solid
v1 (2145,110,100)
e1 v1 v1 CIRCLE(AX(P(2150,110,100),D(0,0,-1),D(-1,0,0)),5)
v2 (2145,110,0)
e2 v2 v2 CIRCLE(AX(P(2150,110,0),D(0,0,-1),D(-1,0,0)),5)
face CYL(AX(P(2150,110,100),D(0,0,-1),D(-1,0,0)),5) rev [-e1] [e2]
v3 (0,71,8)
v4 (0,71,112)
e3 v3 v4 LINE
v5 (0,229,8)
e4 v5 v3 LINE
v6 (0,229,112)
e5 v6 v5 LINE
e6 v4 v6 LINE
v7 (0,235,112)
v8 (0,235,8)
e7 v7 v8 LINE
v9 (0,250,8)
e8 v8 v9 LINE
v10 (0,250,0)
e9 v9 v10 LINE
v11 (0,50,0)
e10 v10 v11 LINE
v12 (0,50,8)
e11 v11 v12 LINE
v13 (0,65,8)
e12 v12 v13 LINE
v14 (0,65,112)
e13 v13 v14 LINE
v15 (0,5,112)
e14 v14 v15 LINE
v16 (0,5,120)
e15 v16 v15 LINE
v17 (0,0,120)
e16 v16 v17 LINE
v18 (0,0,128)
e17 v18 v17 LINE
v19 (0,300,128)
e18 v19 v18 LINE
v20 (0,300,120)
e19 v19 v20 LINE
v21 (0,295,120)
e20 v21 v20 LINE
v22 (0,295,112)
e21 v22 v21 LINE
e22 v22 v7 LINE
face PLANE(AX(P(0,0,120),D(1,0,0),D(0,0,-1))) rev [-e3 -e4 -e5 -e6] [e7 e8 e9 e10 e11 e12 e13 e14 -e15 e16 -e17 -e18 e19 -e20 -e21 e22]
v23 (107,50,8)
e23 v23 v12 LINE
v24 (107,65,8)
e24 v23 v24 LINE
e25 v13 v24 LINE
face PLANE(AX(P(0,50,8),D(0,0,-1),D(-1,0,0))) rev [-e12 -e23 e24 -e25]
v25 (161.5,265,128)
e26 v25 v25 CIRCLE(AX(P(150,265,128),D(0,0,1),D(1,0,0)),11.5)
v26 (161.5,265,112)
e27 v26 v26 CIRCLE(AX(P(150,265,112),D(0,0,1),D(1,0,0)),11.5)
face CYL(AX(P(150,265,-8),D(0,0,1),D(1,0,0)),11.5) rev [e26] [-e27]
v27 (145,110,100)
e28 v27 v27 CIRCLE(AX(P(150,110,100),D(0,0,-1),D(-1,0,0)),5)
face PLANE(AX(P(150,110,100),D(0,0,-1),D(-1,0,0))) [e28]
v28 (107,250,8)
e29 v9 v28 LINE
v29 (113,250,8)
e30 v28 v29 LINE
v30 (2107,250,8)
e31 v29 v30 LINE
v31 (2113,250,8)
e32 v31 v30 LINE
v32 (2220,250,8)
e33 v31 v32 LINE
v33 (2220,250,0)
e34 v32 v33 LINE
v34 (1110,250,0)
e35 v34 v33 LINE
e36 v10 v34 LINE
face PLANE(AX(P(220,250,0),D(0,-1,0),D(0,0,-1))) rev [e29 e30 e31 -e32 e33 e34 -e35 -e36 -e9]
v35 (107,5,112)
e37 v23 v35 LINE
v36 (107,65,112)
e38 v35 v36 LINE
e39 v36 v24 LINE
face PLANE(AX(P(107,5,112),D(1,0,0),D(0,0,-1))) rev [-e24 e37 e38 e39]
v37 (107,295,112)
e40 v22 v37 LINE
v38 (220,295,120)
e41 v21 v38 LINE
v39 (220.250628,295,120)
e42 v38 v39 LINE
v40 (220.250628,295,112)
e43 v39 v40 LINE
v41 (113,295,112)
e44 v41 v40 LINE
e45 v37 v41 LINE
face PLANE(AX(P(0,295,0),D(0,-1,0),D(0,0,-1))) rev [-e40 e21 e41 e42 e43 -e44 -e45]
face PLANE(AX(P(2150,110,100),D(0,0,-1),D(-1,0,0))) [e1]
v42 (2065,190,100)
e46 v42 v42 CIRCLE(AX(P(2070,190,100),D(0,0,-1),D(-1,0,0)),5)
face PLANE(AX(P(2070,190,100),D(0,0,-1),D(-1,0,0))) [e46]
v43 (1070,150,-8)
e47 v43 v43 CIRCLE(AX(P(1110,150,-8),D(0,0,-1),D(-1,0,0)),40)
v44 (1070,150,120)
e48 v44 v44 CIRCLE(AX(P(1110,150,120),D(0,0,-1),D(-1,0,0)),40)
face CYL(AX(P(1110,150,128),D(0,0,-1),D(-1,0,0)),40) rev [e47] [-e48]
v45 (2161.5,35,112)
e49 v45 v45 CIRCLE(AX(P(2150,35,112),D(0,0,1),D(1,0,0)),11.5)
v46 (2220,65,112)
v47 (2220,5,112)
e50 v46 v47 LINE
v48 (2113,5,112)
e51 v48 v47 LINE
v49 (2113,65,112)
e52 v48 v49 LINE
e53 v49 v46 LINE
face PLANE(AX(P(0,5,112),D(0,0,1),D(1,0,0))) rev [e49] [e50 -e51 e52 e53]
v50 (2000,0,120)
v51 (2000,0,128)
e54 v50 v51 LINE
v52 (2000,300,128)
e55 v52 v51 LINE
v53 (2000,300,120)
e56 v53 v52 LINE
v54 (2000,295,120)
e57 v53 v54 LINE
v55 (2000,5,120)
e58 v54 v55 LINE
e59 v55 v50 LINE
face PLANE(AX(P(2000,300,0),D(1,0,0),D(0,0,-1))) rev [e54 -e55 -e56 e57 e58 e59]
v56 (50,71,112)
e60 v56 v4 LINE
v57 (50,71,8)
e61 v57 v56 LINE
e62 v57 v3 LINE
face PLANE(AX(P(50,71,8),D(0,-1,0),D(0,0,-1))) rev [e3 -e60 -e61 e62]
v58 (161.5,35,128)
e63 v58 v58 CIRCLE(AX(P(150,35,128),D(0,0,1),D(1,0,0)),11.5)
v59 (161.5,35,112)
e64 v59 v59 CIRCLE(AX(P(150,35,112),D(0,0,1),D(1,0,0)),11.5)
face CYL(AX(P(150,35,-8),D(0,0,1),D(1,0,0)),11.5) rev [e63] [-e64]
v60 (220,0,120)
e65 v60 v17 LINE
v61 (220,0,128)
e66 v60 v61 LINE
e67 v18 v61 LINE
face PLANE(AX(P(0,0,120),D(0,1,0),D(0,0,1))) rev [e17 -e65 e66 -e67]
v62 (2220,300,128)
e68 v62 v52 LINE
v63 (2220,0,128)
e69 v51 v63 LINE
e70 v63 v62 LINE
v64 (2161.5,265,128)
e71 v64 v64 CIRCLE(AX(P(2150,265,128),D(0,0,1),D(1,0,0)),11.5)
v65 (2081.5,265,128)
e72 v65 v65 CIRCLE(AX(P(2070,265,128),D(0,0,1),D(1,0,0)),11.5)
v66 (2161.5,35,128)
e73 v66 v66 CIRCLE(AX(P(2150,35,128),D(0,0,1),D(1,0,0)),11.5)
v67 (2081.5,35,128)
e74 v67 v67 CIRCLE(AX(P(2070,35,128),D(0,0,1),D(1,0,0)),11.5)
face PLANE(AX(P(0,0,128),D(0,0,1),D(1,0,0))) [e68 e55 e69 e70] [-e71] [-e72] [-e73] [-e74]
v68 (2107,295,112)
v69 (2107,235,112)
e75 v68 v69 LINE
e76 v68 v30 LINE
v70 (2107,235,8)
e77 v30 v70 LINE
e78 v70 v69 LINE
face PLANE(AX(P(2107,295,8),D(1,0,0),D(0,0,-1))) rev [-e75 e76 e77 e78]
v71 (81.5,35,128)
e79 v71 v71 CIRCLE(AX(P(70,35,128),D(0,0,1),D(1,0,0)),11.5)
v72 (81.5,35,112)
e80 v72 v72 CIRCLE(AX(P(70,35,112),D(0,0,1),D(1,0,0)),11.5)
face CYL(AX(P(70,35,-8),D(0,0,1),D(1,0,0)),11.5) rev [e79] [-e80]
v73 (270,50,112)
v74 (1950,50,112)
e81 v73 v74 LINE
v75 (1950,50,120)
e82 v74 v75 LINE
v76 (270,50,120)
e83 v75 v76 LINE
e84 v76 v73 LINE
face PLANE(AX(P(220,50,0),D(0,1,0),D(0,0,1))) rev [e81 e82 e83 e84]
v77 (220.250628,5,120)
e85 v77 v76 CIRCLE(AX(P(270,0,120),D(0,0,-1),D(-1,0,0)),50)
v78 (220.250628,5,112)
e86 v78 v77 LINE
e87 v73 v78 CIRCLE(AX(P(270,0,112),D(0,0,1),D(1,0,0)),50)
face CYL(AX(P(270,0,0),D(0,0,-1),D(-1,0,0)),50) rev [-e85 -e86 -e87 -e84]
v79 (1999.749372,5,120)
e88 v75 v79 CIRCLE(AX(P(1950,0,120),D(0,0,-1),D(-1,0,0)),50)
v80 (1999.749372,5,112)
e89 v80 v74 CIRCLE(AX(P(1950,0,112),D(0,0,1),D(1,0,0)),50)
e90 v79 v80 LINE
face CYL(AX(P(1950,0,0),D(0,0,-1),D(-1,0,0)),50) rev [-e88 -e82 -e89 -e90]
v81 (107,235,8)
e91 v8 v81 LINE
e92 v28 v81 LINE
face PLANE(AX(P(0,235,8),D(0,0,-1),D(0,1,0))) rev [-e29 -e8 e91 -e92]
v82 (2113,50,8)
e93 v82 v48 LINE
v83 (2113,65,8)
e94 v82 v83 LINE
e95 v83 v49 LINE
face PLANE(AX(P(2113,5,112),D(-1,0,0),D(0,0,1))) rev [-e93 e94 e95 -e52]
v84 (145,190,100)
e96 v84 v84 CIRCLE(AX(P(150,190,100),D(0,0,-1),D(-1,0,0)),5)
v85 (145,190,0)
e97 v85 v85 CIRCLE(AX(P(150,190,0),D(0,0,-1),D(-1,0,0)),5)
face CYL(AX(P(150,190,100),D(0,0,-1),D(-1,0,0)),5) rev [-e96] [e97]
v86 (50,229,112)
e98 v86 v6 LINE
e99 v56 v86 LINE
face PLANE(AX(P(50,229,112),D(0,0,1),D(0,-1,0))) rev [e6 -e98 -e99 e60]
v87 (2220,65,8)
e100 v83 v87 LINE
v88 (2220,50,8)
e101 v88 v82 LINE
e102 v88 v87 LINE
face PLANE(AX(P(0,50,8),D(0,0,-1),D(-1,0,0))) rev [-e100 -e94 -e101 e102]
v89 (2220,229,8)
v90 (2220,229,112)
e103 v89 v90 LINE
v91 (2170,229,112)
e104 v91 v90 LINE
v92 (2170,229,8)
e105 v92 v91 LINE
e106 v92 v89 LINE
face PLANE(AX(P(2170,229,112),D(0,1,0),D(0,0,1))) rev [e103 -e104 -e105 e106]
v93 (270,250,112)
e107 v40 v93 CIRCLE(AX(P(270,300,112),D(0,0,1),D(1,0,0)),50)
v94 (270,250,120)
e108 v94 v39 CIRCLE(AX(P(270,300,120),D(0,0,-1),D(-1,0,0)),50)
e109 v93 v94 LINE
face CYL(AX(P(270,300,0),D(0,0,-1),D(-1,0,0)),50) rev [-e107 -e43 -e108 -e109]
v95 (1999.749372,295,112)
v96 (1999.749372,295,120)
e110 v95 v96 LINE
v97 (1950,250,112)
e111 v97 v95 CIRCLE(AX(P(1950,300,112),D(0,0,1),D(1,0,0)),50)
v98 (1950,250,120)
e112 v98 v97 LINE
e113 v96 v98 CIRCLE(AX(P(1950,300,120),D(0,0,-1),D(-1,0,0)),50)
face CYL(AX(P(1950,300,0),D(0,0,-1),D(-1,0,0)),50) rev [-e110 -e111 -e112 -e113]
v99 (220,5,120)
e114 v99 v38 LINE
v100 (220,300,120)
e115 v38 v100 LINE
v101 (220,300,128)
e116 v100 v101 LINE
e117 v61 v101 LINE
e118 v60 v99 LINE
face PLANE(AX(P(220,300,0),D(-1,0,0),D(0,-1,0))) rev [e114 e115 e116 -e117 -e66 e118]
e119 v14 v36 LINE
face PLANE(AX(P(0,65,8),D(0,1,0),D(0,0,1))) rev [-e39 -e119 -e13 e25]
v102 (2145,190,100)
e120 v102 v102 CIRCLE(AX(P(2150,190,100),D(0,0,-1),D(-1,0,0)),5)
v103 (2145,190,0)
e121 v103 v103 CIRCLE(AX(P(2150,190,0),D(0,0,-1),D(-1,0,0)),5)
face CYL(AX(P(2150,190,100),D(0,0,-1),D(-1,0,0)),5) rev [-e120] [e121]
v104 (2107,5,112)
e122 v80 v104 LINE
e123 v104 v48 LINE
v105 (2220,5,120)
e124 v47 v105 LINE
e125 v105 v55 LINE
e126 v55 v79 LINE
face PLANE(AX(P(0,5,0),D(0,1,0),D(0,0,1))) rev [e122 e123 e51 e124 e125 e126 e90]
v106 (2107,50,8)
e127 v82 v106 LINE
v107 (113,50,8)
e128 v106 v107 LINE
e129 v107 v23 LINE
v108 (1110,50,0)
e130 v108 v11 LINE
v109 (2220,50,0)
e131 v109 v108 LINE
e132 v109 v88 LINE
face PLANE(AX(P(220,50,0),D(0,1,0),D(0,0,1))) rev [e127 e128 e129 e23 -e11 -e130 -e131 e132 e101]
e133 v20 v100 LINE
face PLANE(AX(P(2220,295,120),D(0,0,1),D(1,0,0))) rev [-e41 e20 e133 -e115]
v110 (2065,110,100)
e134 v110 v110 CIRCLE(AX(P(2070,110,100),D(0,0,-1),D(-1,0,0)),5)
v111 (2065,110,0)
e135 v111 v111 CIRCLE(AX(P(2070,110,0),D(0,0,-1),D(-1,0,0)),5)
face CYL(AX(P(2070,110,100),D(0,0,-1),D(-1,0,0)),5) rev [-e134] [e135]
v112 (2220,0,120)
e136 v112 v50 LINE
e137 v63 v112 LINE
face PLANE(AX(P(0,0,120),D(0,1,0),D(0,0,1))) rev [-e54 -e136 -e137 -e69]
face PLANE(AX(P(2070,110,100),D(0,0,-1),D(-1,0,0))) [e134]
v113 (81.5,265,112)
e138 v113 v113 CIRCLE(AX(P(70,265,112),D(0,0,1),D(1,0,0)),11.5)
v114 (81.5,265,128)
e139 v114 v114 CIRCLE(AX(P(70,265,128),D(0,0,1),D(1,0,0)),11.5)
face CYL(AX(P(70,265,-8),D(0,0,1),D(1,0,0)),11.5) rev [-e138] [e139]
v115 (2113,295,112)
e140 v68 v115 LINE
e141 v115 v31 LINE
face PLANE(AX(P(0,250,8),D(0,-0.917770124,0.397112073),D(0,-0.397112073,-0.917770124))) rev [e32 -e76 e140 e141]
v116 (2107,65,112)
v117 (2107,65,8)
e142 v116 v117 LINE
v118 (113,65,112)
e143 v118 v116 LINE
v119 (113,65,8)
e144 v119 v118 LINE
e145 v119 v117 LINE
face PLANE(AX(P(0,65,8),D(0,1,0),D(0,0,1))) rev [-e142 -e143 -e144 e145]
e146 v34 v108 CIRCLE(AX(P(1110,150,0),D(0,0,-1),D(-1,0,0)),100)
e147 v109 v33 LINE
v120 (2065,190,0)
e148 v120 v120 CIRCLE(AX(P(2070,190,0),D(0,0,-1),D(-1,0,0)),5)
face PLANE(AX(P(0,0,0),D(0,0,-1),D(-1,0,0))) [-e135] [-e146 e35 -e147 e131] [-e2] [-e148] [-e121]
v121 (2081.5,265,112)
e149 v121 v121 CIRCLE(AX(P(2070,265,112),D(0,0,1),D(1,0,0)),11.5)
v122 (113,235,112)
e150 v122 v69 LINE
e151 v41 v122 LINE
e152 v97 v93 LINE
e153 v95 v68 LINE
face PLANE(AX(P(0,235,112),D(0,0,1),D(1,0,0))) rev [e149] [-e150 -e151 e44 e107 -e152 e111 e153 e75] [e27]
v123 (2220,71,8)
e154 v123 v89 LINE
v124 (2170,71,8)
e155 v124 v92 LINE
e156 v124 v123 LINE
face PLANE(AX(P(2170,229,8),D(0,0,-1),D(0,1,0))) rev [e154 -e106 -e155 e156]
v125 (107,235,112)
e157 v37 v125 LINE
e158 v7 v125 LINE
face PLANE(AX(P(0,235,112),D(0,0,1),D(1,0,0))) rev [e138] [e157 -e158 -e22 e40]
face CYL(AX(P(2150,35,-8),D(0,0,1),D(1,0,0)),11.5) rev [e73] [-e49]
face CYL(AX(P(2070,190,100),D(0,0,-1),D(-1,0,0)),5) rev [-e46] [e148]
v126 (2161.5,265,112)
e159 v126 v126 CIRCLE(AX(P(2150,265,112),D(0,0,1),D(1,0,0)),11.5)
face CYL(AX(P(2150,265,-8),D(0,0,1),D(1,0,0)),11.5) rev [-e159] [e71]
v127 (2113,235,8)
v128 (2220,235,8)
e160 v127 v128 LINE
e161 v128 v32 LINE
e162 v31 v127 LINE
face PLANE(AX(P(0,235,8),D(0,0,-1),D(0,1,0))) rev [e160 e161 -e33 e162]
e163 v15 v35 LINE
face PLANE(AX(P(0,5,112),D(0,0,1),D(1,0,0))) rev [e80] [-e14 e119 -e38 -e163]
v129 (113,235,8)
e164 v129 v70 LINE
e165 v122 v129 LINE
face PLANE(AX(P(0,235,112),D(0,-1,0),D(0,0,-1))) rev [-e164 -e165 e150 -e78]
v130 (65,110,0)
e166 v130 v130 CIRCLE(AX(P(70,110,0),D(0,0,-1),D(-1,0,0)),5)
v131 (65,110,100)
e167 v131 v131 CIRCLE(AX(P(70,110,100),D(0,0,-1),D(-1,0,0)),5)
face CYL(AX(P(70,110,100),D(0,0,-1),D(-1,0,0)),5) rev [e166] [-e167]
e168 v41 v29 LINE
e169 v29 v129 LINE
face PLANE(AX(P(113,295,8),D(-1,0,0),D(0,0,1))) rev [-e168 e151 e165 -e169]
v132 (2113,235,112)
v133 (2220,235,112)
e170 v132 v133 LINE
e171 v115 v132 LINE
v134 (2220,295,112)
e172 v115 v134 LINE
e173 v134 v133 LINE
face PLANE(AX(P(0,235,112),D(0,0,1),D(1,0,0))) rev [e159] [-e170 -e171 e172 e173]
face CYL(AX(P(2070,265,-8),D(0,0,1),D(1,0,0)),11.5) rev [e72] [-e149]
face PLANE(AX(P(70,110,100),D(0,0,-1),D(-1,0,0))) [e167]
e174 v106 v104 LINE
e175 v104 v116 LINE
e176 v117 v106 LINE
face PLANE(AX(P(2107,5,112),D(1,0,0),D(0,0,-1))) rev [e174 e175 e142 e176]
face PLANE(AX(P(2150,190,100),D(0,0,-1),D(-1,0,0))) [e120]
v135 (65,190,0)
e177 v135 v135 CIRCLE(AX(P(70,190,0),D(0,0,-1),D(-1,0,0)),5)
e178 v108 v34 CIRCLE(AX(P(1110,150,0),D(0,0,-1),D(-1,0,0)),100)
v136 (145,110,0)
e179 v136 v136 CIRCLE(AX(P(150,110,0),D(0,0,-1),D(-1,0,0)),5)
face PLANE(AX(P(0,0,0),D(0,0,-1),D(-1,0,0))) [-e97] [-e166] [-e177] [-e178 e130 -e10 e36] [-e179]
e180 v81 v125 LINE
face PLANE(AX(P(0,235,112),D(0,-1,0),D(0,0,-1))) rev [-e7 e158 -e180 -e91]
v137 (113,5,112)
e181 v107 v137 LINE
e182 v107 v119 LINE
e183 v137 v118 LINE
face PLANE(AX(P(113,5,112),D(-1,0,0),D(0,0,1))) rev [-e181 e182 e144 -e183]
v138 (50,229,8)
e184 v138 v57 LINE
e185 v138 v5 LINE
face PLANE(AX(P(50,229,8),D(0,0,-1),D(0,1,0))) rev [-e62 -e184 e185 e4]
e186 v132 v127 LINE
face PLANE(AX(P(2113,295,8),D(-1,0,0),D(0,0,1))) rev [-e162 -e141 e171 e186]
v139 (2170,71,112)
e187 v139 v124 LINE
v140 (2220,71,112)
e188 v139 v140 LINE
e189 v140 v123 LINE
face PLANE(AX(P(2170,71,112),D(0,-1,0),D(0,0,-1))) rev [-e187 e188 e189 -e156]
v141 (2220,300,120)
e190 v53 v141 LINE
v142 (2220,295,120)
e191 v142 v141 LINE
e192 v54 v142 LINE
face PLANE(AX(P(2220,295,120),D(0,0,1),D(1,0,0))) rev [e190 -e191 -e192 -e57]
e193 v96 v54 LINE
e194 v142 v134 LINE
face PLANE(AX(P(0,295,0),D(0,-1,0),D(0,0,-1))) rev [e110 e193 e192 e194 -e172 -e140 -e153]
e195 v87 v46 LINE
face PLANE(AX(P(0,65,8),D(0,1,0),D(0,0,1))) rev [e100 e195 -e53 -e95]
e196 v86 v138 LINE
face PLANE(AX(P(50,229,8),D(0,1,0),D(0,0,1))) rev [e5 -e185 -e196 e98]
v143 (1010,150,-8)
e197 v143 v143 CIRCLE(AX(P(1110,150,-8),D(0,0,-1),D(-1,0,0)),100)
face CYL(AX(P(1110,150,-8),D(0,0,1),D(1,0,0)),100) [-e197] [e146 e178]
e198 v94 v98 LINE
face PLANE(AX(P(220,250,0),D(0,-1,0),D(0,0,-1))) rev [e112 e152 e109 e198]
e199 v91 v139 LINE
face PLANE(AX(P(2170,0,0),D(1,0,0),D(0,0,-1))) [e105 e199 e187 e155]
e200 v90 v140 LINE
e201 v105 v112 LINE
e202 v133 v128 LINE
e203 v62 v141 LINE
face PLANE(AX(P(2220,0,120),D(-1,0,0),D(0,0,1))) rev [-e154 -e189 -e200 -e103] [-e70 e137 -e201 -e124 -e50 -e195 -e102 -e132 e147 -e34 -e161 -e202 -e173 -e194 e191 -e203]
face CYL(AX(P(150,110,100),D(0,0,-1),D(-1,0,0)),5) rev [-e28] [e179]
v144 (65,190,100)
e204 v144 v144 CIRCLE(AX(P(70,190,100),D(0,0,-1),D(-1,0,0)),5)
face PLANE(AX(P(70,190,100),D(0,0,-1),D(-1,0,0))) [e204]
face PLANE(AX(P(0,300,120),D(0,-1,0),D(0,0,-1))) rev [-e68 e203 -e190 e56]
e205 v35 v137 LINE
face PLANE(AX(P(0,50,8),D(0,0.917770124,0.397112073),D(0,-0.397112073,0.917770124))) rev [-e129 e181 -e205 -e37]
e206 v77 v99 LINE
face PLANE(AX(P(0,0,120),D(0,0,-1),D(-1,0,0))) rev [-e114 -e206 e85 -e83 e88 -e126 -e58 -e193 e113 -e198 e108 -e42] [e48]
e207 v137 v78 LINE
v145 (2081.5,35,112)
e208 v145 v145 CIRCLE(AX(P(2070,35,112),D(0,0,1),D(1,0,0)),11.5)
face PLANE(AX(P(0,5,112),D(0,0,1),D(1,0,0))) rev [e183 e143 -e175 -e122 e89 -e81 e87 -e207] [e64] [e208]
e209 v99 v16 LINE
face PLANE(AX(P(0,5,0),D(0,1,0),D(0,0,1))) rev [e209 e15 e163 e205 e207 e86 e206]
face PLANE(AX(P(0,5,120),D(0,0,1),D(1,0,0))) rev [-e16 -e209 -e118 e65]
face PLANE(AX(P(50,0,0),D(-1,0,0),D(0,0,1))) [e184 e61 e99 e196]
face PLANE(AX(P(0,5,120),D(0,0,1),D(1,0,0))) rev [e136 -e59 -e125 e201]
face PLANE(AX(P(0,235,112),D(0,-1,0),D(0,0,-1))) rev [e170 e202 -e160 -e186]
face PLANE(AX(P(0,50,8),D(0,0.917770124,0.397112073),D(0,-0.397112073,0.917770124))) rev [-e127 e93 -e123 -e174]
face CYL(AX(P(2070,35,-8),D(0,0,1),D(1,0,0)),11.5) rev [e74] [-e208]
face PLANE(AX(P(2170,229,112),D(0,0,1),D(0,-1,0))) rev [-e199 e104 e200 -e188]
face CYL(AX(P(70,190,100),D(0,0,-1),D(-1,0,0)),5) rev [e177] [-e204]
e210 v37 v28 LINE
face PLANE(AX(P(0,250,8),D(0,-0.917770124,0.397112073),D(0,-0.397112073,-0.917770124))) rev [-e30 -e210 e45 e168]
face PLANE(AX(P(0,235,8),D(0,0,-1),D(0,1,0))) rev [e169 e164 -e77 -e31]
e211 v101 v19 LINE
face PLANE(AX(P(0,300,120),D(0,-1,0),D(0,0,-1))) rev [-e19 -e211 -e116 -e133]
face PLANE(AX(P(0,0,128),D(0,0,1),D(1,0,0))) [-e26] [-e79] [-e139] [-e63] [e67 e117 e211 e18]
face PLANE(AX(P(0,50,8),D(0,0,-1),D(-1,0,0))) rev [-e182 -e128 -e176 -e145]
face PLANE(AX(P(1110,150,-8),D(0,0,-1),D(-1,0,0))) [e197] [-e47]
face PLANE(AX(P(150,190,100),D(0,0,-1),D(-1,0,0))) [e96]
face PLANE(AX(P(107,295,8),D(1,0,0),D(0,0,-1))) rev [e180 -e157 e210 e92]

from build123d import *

# Parameters (mm, degrees)
SKETCH_1_W                       = 2220
SKETCH_1_H                       = 300
EXTRUDE_1_DEPTH                  = 120
SKETCH_2_W                       = 1780
SKETCH_2_H                       = 50
CUT_EXTRUDE_1_DEPTH              = 2244.390291501
SKETCH_3_W                       = 220
SKETCH_3_H                       = 300
EXTRUDE_2_DEPTH                  = 8
SKETCH_4_W                       = 2220
SKETCH_4_H                       = 120
CUT_EXTRUDE_2_DEPTH              = 5
SKETCH_5_W                       = 2220
SKETCH_5_H                       = 120
CUT_EXTRUDE_3_DEPTH              = 5
CUT_EXTRUDE_11_DEPTH             = 2244.832435812
SKETCH_14_W                      = 6
SKETCH_14_H                      = 104
EXTRUDE_3_DEPTH                  = 60
SKETCH_16_W                      = 6
SKETCH_16_H                      = 104
EXTRUDE_4_DEPTH                  = 60
CUT_EXTRUDE_12_DEPTH             = 2139.025490961
PATTERN_LINEAR_2_COUNT           = 2
PATTERN_LINEAR_2_PITCH           = 2000
FILLET_3_R                       = 50
SKETCH_17_W                      = 104
SKETCH_17_H                      = 158
CUT_EXTRUDE_13_DEPTH             = 50
SKETCH_18_W                      = 104
SKETCH_18_H                      = 158
CUT_EXTRUDE_14_DEPTH             = 50
SKETCH_19_R                      = 100
EXTRUDE_5_DEPTH                  = 8
SKETCH_20_R                      = 40
CUT_EXTRUDE_15_DEPTH             = 2245.303009845
SKETCH_21_R                      = 11.5
CUT_EXTRUDE_16_DEPTH             = 2245.303009845
PATTERN_LINEAR_3_COUNT           = 2
PATTERN_LINEAR_3_PITCH           = 80
PATTERN_LINEAR_3_COUNT_DIR2      = 2
PATTERN_LINEAR_3_PITCH_DIR2      = 230
PATTERN_LINEAR_4_COUNT           = 2
PATTERN_LINEAR_4_PITCH           = 2000
PATTERN_LINEAR_4_COPY_1_SKETCH_R = 11.5
PATTERN_LINEAR_4_COPY_1_DEPTH    = 2245.303009845
PATTERN_LINEAR_4_COPY_2_SKETCH_R = 11.5
PATTERN_LINEAR_4_COPY_2_DEPTH    = 2245.303009845
PATTERN_LINEAR_4_COPY_3_SKETCH_R = 11.5
PATTERN_LINEAR_4_COPY_3_DEPTH    = 2245.303009845
SKETCH_22_R                      = 5
CUT_EXTRUDE_17_DEPTH             = 100
PATTERN_LINEAR_5_COUNT           = 2
PATTERN_LINEAR_5_PITCH           = 80
PATTERN_LINEAR_5_COUNT_DIR2      = 2
PATTERN_LINEAR_5_PITCH_DIR2      = 80
PATTERN_LINEAR_6_COUNT           = 2
PATTERN_LINEAR_6_PITCH           = 2000
PATTERN_LINEAR_6_COPY_1_SKETCH_R = 5
PATTERN_LINEAR_6_COPY_1_DEPTH    = 100
PATTERN_LINEAR_6_COPY_2_SKETCH_R = 5
PATTERN_LINEAR_6_COPY_2_DEPTH    = 100
PATTERN_LINEAR_6_COPY_3_SKETCH_R = 5
PATTERN_LINEAR_6_COPY_3_DEPTH    = 100


with BuildPart() as part:
    # 草图1 → 凸台-拉伸1 (new body)
    with BuildSketch(Plane.XY):
        with Locations((1110, 150)):
            Rectangle(SKETCH_1_W, SKETCH_1_H)
    extrude(amount=EXTRUDE_1_DEPTH)

    # 草图2 → 切除-拉伸1 (cut, through all)
    with BuildSketch(Plane.XY.offset(120)):
        with Locations((1110, 275)):
            Rectangle(SKETCH_2_W, SKETCH_2_H)
        with Locations((1110, 25)):
            Rectangle(SKETCH_2_W, SKETCH_2_H)
    extrude(amount=-CUT_EXTRUDE_1_DEPTH, mode=Mode.SUBTRACT)

    # 草图3 → 凸台-拉伸2 (add)
    with BuildSketch(Plane.XY.offset(120)):
        with Locations((110, 150)):
            Rectangle(SKETCH_3_W, SKETCH_3_H)
        with Locations((2110, 150)):
            Rectangle(SKETCH_3_W, SKETCH_3_H)
    extrude(amount=EXTRUDE_2_DEPTH)

    # 草图4 → 切除-拉伸2 (cut)
    with BuildSketch(Plane(origin=(0, 300, 0), x_dir=(1, 0, 0), z_dir=(0, 1, 0))):
        with Locations((1110, -60)):
            Rectangle(SKETCH_4_W, SKETCH_4_H)
    extrude(amount=-CUT_EXTRUDE_2_DEPTH, mode=Mode.SUBTRACT)

    # 草图5 → 切除-拉伸3 (cut)
    with BuildSketch(Plane.XZ):
        with Locations((1110, 60)):
            Rectangle(SKETCH_5_W, SKETCH_5_H)
    extrude(amount=-CUT_EXTRUDE_3_DEPTH, mode=Mode.SUBTRACT)

    # 草图13 → 切除-拉伸11 (cut, through all)
    with BuildSketch(Plane(origin=(2220, 0, 0), x_dir=(0, 0, -1), z_dir=(1, 0, 0))):
        Polygon((-112, 235), (-8, 235), (-8, 250), (0, 250), (0, 295), (-112, 295), align=None)
        Polygon((-112, 5), (0, 5), (0, 50), (-8, 50), (-8, 65), (-112, 65), align=None)
    extrude(amount=-CUT_EXTRUDE_11_DEPTH, mode=Mode.SUBTRACT)

    # 草图14 → 凸台-拉伸3 (add)
    with BuildSketch(Plane(origin=(0, 235, 0), x_dir=(1, 0, 0), z_dir=(0, 1, 0))):
        with Locations((2110, -60)):
            Rectangle(SKETCH_14_W, SKETCH_14_H)
    extrude_3 = extrude(amount=EXTRUDE_3_DEPTH)

    # 草图16 → 凸台-拉伸4 (add)
    with BuildSketch(Plane.XZ.offset(-65)):
        with Locations((2110, 60)):
            Rectangle(SKETCH_16_W, SKETCH_16_H)
    extrude_4 = extrude(amount=EXTRUDE_4_DEPTH)

    # 草图15 → 切除-拉伸12 (cut, through all)
    with BuildSketch(Plane(origin=(2113, 0, 0), x_dir=(0, 0, -1), z_dir=(1, 0, 0))):
        Polygon((-8, 295), (-8, 250), (-112, 295), align=None)
        Polygon((-8, 50), (-112, 5), (-8, 5), align=None)
    cut_extrude_12 = extrude(amount=-CUT_EXTRUDE_12_DEPTH, mode=Mode.SUBTRACT)

    # 阵列(线性)2: 凸台-拉伸3, 凸台-拉伸4, 切除-拉伸12 ×2
    with Locations(*[(-i * PATTERN_LINEAR_2_PITCH, 0, 0) for i in range(1, PATTERN_LINEAR_2_COUNT)]):
        add(extrude_3)
        add(extrude_4)
        add(cut_extrude_12, mode=Mode.SUBTRACT)

    # 圆角3
    # the kernel refuses this fillet: 50 mm, written as the material it adds along each edge
    with BuildSketch(Plane(origin=(220, 250, 120), x_dir=(0, 1, 0), z_dir=(0, 0, -1))) as fillet_3_piece_1_section:
        with BuildLine():
            CenterArc((FILLET_3_R, FILLET_3_R), FILLET_3_R, 180, 90)
            Line((0, FILLET_3_R), (0, 0))
            Line((0, 0), (FILLET_3_R, 0))
        make_face()
    fillet_3_piece_1 = extrude(amount=8, mode=Mode.PRIVATE)
    fillet_3_piece_1 = split(fillet_3_piece_1, bisect_by=Plane(origin=(231.177032, 295, 116), z_dir=(0, -1, 0)), keep=Keep.TOP, mode=Mode.PRIVATE)
    add(fillet_3_piece_1)
    with BuildSketch(Plane(origin=(2000, 250, 120), x_dir=(-1, 0, 0), z_dir=(0, 0, -1))) as fillet_3_piece_2_section:
        with BuildLine():
            CenterArc((FILLET_3_R, FILLET_3_R), FILLET_3_R, 180, 90)
            Line((0, FILLET_3_R), (0, 0))
            Line((0, 0), (FILLET_3_R, 0))
        make_face()
    fillet_3_piece_2 = extrude(amount=8, mode=Mode.PRIVATE)
    fillet_3_piece_2 = split(fillet_3_piece_2, bisect_by=Plane(origin=(1988.822968, 295, 116), z_dir=(0, -1, 0)), keep=Keep.TOP, mode=Mode.PRIVATE)
    add(fillet_3_piece_2)
    with BuildSketch(Plane(origin=(2000, 50, 120), x_dir=(-1, 0, 0), z_dir=(0, 0, -1))) as fillet_3_piece_3_section:
        with BuildLine():
            CenterArc((FILLET_3_R, -FILLET_3_R), FILLET_3_R, 90, 90)
            Line((0, -FILLET_3_R), (0, 0))
            Line((0, 0), (FILLET_3_R, 0))
        make_face()
    fillet_3_piece_3 = extrude(amount=8, mode=Mode.PRIVATE)
    fillet_3_piece_3 = split(fillet_3_piece_3, bisect_by=Plane(origin=(1988.822968, 5, 116), z_dir=(0, 1, 0)), keep=Keep.TOP, mode=Mode.PRIVATE)
    add(fillet_3_piece_3)
    with BuildSketch(Plane(origin=(220, 50, 120), x_dir=(0, -1, 0), z_dir=(0, 0, -1))) as fillet_3_piece_4_section:
        with BuildLine():
            CenterArc((FILLET_3_R, -FILLET_3_R), FILLET_3_R, 90, 90)
            Line((0, -FILLET_3_R), (0, 0))
            Line((0, 0), (FILLET_3_R, 0))
        make_face()
    fillet_3_piece_4 = extrude(amount=8, mode=Mode.PRIVATE)
    fillet_3_piece_4 = split(fillet_3_piece_4, bisect_by=Plane(origin=(231.177032, 5, 116), z_dir=(0, 1, 0)), keep=Keep.TOP, mode=Mode.PRIVATE)
    add(fillet_3_piece_4)

    # 草图17 → 切除-拉伸13 (cut)
    with BuildSketch(Plane.ZY):
        with Locations((60, 150)):
            Rectangle(SKETCH_17_W, SKETCH_17_H)
    extrude(amount=-CUT_EXTRUDE_13_DEPTH, mode=Mode.SUBTRACT)

    # 草图18 → 切除-拉伸14 (cut)
    with BuildSketch(Plane(origin=(2220, 0, 0), x_dir=(0, 0, -1), z_dir=(1, 0, 0))):
        with Locations((-60, 150)):
            Rectangle(SKETCH_18_W, SKETCH_18_H)
    extrude(amount=-CUT_EXTRUDE_14_DEPTH, mode=Mode.SUBTRACT)

    # 草图19 → 凸台-拉伸5 (add)
    with BuildSketch(Plane(origin=(0, 0, 0), x_dir=(-1, 0, 0), z_dir=(0, 0, -1))):
        with Locations(Location((-1110, 150, 0), (0, 0, 270))):
            Circle(SKETCH_19_R)
    extrude(amount=EXTRUDE_5_DEPTH)

    # 草图20 → 切除-拉伸15 (cut, through all)
    with BuildSketch(Plane(origin=(0, 0, -8), x_dir=(-1, 0, 0), z_dir=(0, 0, -1))):
        with Locations((-1110, 150)):
            Circle(SKETCH_20_R)
    extrude(amount=-CUT_EXTRUDE_15_DEPTH, mode=Mode.SUBTRACT)

    # 草图21 → 切除-拉伸16 (cut, through all)
    with BuildSketch(Plane.XY.offset(128)):
        with Locations((2150, 35)):
            Circle(SKETCH_21_R)
    cut_extrude_16 = extrude(amount=-CUT_EXTRUDE_16_DEPTH, mode=Mode.SUBTRACT)

    # 阵列(线性)3: Cut-Extrude 16 2 × 2
    with Locations(*[(-i * PATTERN_LINEAR_3_PITCH, j * PATTERN_LINEAR_3_PITCH_DIR2, 0) for i in range(PATTERN_LINEAR_3_COUNT) for j in range(PATTERN_LINEAR_3_COUNT_DIR2) if (i, j) != (0, 0)]):
        add(cut_extrude_16, mode=Mode.SUBTRACT)

    # 阵列(线性)4: 切除-拉伸16 ×2
    with Locations(*[(-i * PATTERN_LINEAR_4_PITCH, 0, 0) for i in range(1, PATTERN_LINEAR_4_COUNT)]):
        add(cut_extrude_16, mode=Mode.SUBTRACT)

    # 阵列(线性)4 copy 1 sketch → 阵列(线性)4 copy 1 (cut, through all)
    with BuildSketch(Plane(origin=(-2000, 230, 128), x_dir=(1, 0, 0), z_dir=(0, 0, 1))):
        with Locations((2150, 35)):
            Circle(PATTERN_LINEAR_4_COPY_1_SKETCH_R)
    extrude(amount=-PATTERN_LINEAR_4_COPY_1_DEPTH, mode=Mode.SUBTRACT)

    # 阵列(线性)4 copy 2 sketch → 阵列(线性)4 copy 2 (cut, through all)
    with BuildSketch(Plane(origin=(-2080, 0, 128), x_dir=(1, 0, 0), z_dir=(0, 0, 1))):
        with Locations((2150, 35)):
            Circle(PATTERN_LINEAR_4_COPY_2_SKETCH_R)
    extrude(amount=-PATTERN_LINEAR_4_COPY_2_DEPTH, mode=Mode.SUBTRACT)

    # 阵列(线性)4 copy 3 sketch → 阵列(线性)4 copy 3 (cut, through all)
    with BuildSketch(Plane(origin=(-2080, 230, 128), x_dir=(1, 0, 0), z_dir=(0, 0, 1))):
        with Locations((2150, 35)):
            Circle(PATTERN_LINEAR_4_COPY_3_SKETCH_R)
    extrude(amount=-PATTERN_LINEAR_4_COPY_3_DEPTH, mode=Mode.SUBTRACT)

    # 草图22 → 切除-拉伸17 (cut)
    with BuildSketch(Plane(origin=(0, 0, 0), x_dir=(-1, 0, 0), z_dir=(0, 0, -1))):
        with Locations((-2150, 190)):
            Circle(SKETCH_22_R)
    cut_extrude_17 = extrude(amount=-CUT_EXTRUDE_17_DEPTH, mode=Mode.SUBTRACT)

    # 阵列(线性)5: Cut-Extrude 17 2 × 2
    with Locations(*[(-i * PATTERN_LINEAR_5_PITCH, -j * PATTERN_LINEAR_5_PITCH_DIR2, 0) for i in range(PATTERN_LINEAR_5_COUNT) for j in range(PATTERN_LINEAR_5_COUNT_DIR2) if (i, j) != (0, 0)]):
        add(cut_extrude_17, mode=Mode.SUBTRACT)

    # 阵列(线性)6: 切除-拉伸17 ×2
    with Locations(*[(-i * PATTERN_LINEAR_6_PITCH, 0, 0) for i in range(1, PATTERN_LINEAR_6_COUNT)]):
        add(cut_extrude_17, mode=Mode.SUBTRACT)

    # 阵列(线性)6 copy 1 sketch → 阵列(线性)6 copy 1 (cut)
    with BuildSketch(Plane(origin=(-2000, -80, 0), x_dir=(-1, 0, 0), z_dir=(0, 0, -1))):
        with Locations((-2150, 190)):
            Circle(PATTERN_LINEAR_6_COPY_1_SKETCH_R)
    extrude(amount=-PATTERN_LINEAR_6_COPY_1_DEPTH, mode=Mode.SUBTRACT)

    # 阵列(线性)6 copy 2 sketch → 阵列(线性)6 copy 2 (cut)
    with BuildSketch(Plane(origin=(-2080, 0, 0), x_dir=(-1, 0, 0), z_dir=(0, 0, -1))):
        with Locations((-2150, 190)):
            Circle(PATTERN_LINEAR_6_COPY_2_SKETCH_R)
    extrude(amount=-PATTERN_LINEAR_6_COPY_2_DEPTH, mode=Mode.SUBTRACT)

    # 阵列(线性)6 copy 3 sketch → 阵列(线性)6 copy 3 (cut)
    with BuildSketch(Plane(origin=(-2080, -80, 0), x_dir=(-1, 0, 0), z_dir=(0, 0, -1))):
        with Locations((-2150, 190)):
            Circle(PATTERN_LINEAR_6_COPY_3_SKETCH_R)
    extrude(amount=-PATTERN_LINEAR_6_COPY_3_DEPTH, mode=Mode.SUBTRACT)


solid = part.part
